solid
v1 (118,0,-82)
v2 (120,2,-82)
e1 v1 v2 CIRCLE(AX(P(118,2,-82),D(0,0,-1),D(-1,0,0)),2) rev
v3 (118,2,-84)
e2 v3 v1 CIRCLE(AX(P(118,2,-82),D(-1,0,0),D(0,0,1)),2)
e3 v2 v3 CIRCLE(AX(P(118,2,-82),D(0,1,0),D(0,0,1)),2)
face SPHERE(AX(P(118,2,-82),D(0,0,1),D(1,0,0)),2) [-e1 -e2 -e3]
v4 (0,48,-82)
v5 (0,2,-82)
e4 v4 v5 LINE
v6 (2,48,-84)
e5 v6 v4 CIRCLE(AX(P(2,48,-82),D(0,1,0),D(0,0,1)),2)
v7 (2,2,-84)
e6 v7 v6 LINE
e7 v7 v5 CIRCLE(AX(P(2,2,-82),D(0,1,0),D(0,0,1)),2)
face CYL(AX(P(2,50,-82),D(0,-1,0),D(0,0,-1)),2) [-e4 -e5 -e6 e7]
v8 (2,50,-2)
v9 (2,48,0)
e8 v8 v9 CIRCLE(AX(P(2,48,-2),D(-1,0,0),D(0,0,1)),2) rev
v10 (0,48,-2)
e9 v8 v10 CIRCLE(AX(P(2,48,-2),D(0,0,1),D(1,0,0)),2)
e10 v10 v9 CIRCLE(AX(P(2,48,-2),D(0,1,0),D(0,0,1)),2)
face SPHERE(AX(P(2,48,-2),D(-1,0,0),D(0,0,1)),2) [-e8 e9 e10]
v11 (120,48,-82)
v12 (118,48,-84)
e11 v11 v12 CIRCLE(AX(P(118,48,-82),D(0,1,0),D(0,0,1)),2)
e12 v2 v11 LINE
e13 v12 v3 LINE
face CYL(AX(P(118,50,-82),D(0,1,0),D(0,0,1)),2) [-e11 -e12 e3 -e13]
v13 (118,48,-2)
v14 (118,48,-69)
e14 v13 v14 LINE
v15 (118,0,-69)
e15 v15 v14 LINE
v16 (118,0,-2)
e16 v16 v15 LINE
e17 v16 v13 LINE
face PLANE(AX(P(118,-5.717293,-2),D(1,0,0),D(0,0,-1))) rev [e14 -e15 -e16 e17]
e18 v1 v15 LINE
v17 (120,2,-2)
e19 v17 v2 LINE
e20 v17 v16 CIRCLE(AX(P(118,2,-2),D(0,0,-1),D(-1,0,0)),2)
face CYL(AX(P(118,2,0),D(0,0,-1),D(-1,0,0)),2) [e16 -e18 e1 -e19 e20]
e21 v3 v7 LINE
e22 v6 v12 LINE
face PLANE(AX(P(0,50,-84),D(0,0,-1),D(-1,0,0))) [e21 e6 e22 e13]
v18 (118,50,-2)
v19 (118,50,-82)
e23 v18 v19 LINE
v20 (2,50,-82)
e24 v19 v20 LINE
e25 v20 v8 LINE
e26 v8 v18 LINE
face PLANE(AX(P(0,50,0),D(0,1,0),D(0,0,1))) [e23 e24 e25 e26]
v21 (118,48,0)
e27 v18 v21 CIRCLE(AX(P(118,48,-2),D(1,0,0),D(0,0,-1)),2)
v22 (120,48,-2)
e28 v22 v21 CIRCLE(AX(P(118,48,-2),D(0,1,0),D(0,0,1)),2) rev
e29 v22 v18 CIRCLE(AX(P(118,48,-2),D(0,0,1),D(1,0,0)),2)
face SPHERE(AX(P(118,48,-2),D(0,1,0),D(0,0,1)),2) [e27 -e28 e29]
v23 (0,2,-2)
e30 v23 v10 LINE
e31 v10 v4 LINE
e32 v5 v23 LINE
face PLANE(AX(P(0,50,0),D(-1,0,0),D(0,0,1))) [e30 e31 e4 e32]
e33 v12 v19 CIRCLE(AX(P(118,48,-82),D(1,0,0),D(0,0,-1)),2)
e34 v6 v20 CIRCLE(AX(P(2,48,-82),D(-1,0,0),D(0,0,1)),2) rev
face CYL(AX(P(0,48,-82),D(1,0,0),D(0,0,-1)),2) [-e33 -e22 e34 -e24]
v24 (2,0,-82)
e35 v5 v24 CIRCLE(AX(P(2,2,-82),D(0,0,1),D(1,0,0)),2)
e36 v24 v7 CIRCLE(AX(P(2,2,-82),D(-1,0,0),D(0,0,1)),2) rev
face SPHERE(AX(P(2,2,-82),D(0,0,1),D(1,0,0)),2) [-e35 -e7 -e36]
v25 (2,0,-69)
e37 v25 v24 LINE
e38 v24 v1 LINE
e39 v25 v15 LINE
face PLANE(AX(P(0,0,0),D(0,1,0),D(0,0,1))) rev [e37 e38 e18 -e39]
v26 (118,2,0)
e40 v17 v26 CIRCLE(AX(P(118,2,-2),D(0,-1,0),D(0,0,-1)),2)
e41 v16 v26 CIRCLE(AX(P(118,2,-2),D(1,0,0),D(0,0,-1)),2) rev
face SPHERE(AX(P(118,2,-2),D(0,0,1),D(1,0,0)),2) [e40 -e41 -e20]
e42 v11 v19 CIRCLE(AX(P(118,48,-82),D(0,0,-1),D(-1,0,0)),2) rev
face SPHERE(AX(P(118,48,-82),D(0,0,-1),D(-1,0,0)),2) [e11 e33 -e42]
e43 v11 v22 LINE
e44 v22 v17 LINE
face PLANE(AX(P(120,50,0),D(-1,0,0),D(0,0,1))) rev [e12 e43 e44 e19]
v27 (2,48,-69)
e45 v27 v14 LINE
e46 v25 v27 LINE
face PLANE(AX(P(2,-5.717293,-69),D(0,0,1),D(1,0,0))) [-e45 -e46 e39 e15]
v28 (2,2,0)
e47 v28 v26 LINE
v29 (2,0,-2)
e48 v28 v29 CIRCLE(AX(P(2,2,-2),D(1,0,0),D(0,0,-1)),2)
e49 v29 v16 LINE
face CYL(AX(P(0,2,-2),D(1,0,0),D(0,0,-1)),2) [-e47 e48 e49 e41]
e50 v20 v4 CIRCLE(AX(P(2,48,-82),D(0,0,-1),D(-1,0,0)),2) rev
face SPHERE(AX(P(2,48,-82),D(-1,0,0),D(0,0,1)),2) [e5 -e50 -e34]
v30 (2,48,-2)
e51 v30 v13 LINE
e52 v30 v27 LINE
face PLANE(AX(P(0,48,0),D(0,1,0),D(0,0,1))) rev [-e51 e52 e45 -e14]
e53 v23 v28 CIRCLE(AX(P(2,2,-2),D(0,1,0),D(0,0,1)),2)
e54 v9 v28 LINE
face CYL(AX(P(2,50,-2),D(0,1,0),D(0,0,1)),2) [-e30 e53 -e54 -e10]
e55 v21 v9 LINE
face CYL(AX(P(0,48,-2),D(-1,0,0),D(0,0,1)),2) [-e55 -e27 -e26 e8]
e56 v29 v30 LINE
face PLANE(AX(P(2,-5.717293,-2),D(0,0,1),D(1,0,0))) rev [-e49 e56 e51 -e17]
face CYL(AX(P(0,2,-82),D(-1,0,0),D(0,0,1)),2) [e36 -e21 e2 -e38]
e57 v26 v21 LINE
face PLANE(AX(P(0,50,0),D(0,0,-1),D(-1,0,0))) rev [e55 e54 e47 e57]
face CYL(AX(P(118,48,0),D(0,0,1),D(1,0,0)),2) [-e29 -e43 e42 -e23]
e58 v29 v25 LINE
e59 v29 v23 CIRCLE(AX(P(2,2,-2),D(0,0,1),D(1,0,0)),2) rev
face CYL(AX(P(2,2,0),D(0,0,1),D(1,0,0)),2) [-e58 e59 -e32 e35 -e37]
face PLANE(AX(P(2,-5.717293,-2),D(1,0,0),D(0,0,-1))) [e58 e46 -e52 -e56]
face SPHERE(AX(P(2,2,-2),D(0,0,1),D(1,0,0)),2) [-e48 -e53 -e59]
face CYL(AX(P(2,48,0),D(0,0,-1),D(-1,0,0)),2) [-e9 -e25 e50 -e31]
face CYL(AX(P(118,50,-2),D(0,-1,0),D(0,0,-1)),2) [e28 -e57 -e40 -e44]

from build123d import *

# Parameters (mm, degrees)
SKETCH4_W                = 120
SKETCH4_H                = 84
BOSS_EXTRUDE2_DEPTH      = 50
BOSS_EXTRUDE4_DEPTH      = 48
BOSS_EXTRUDE4_DEPTH_BACK = 5.717293385
SKETCH5_W                = 116
SKETCH5_H                = 67
FILLET2_R                = 2
FILLET3_R                = 2


# Some blends are built 0.0001 mm under size
with BuildPart() as part:
    # Sketch4 → Boss-Extrude2 (new body)
    with BuildSketch(Plane(origin=(0, 0, 0), x_dir=(1, 0, 0), z_dir=(0, 1, 0))):
        with Locations((60, 42)):
            Rectangle(SKETCH4_W, SKETCH4_H)
    extrude(amount=BOSS_EXTRUDE2_DEPTH)


with BuildPart() as body_2:
    # Sketch5 → Boss-Extrude4 (new, two sides: drawn at the far end of the back side and taken through both)
    with BuildSketch(Plane(origin=(0, 0, 0), x_dir=(1, 0, 0), z_dir=(0, 1, 0)).offset(-BOSS_EXTRUDE4_DEPTH_BACK)):
        with Locations((60, 35.5)):
            Rectangle(SKETCH5_W, SKETCH5_H)
    extrude(amount=BOSS_EXTRUDE4_DEPTH + BOSS_EXTRUDE4_DEPTH_BACK)


with BuildPart() as part_1:
    add(part.part)

    # Combine1: cut body 2
    add(body_2.part, mode=Mode.SUBTRACT)

    # Fillet2
    fillet2_edges = [part_1.edges().sort_by_distance(p)[0] for p in [
        (0, 0, -42),
        (60, 0, -84),
        (120, 0, -42),
        (60, 0, 0),
    ]]
    fillet(fillet2_edges, radius=FILLET2_R - 0.0001)  # a hair under: the kernel refuses the full size

    # Fillet3
    # the kernel refuses this fillet: 2 mm, written as the material it takes off along each edge
    with BuildSketch(Plane(origin=(118, 0, -2), x_dir=(1, 0, 0), z_dir=(0, 0, -1))) as fillet3_piece_1:
        with BuildLine():
            CenterArc((0.0001, -1.9999), 1.9999, 0, 90)
            Line((2, -1.9999), (2, 0))
            Line((2, 0), (0.0001, 0))
        make_face()
    revolve(axis=Axis((118, 0, -2), (0, -1, 0)), revolution_arc=90, mode=Mode.SUBTRACT)
    with BuildSketch(Plane(origin=(118, 0, -82), x_dir=(0, 0, -1), z_dir=(-1, 0, 0))) as fillet3_piece_2:
        with BuildLine():
            CenterArc((0.0001, -1.9999), 1.9999, 0, 90)
            Line((2, -1.9999), (2, 0))
            Line((2, 0), (0.0001, 0))
        make_face()
    revolve(axis=Axis((118, 0, -82), (0, -1, 0)), revolution_arc=90, mode=Mode.SUBTRACT)
    with BuildSketch(Plane(origin=(2, 0, -2), x_dir=(0, 0, 1), z_dir=(1, 0, 0))) as fillet3_piece_3:
        with BuildLine():
            CenterArc((0.0001, -1.9999), 1.9999, 0, 90)
            Line((2, -1.9999), (2, 0))
            Line((2, 0), (0.0001, 0))
        make_face()
    revolve(axis=Axis((2, 0, -2), (0, -1, 0)), revolution_arc=90, mode=Mode.SUBTRACT)
    with BuildSketch(Plane(origin=(2, 0, -82), x_dir=(-1, 0, 0), z_dir=(0, 0, 1))) as fillet3_piece_4:
        with BuildLine():
            CenterArc((0.0001, -1.9999), 1.9999, 0, 90)
            Line((2, -1.9999), (2, 0))
            Line((2, 0), (0.0001, 0))
        make_face()
    revolve(axis=Axis((2, 0, -82), (0, -1, 0)), revolution_arc=90, mode=Mode.SUBTRACT)
    with BuildSketch(Plane(origin=(118, 48, -82), x_dir=(1, 0, 0), z_dir=(0, 1, 0))) as fillet3_piece_5_section:
        Polygon((0, 0), (FILLET3_R, 0), (FILLET3_R, FILLET3_R), (0, FILLET3_R), align=None)
    fillet3_piece_5 = extrude(amount=FILLET3_R, mode=Mode.PRIVATE)
    fillet3_piece_5 = fillet3_piece_5 - Plane(origin=(118, 48, -82), x_dir=(-0.7071067811865475, 0, 0.7071067811865475), z_dir=(0, 1, 0)) * Sphere(FILLET3_R, mode=Mode.PRIVATE)
    add(fillet3_piece_5, mode=Mode.SUBTRACT)
    with BuildSketch(Plane(origin=(2, 48, -82), x_dir=(0, 1, 0), z_dir=(-1, 0, 0))) as fillet3_piece_6_section:
        Polygon((0, 0), (FILLET3_R, 0), (FILLET3_R, FILLET3_R), (0, FILLET3_R), align=None)
    fillet3_piece_6 = extrude(amount=FILLET3_R, mode=Mode.PRIVATE)
    fillet3_piece_6 = fillet3_piece_6 - Plane(origin=(2, 48, -82), x_dir=(0, -0.7071067811865475, 0.7071067811865475), z_dir=(-1, 0, 0)) * Sphere(FILLET3_R, mode=Mode.PRIVATE)
    add(fillet3_piece_6, mode=Mode.SUBTRACT)
    with BuildSketch(Plane(origin=(2, 48, -2), x_dir=(-1, 0, 0), z_dir=(0, 0, 1))) as fillet3_piece_7_section:
        Polygon((0, 0), (FILLET3_R, 0), (FILLET3_R, -FILLET3_R), (0, -FILLET3_R), align=None)
    fillet3_piece_7 = extrude(amount=FILLET3_R, mode=Mode.PRIVATE)
    fillet3_piece_7 = fillet3_piece_7 - Plane(origin=(2, 48, -2), x_dir=(0.7071067811865475, -0.7071067811865475, 0), z_dir=(0, 0, 1)) * Sphere(FILLET3_R, mode=Mode.PRIVATE)
    add(fillet3_piece_7, mode=Mode.SUBTRACT)
    with BuildSketch(Plane(origin=(118, 48, -2), x_dir=(0, 1, 0), z_dir=(0, 0, 1))) as fillet3_piece_8_section:
        Polygon((0, 0), (FILLET3_R, 0), (FILLET3_R, -FILLET3_R), (0, -FILLET3_R), align=None)
    fillet3_piece_8 = extrude(amount=FILLET3_R, mode=Mode.PRIVATE)
    fillet3_piece_8 = fillet3_piece_8 - Plane(origin=(118, 48, -2), x_dir=(-0.7071067811865475, -0.7071067811865475, 0), z_dir=(0, 0, 1)) * Sphere(FILLET3_R, mode=Mode.PRIVATE)
    add(fillet3_piece_8, mode=Mode.SUBTRACT)
    with BuildSketch(Plane(origin=(118, 50, -84), x_dir=(0, 0, 1), z_dir=(-1, 0, 0))) as fillet3_piece_9:
        with BuildLine():
            CenterArc((FILLET3_R, -FILLET3_R), FILLET3_R, 90, 90)
            Line((0, -FILLET3_R), (0, 0))
            Line((0, 0), (FILLET3_R, 0))
        make_face()
    extrude(amount=116, mode=Mode.SUBTRACT)
    with BuildSketch(Plane(origin=(0, 50, -82), x_dir=(0, -1, 0), z_dir=(0, 0, 1))) as fillet3_piece_10:
        with BuildLine():
            CenterArc((FILLET3_R, FILLET3_R), FILLET3_R, 180, 90)
            Line((0, FILLET3_R), (0, 0))
            Line((0, 0), (FILLET3_R, 0))
        make_face()
    extrude(amount=80, mode=Mode.SUBTRACT)
    with BuildSketch(Plane(origin=(2, 50, 0), x_dir=(0, -1, 0), z_dir=(1, 0, 0))) as fillet3_piece_11:
        with BuildLine():
            CenterArc((FILLET3_R, FILLET3_R), FILLET3_R, 180, 90)
            Line((0, FILLET3_R), (0, 0))
            Line((0, 0), (FILLET3_R, 0))
        make_face()
    extrude(amount=116, mode=Mode.SUBTRACT)
    with BuildSketch(Plane(origin=(0, 0, 0), x_dir=(1, 0, 0), z_dir=(0, 1, 0)), Plane(origin=(0, 0, -84), x_dir=(0, 0, 1), z_dir=(0, 1, 0))) as fillet3_piece_12:
        with BuildLine():
            CenterArc((FILLET3_R, FILLET3_R), FILLET3_R, 180, 90)
            Line((0, FILLET3_R), (0, 0))
            Line((0, 0), (FILLET3_R, 0))
        make_face()
    extrude(amount=48, mode=Mode.SUBTRACT)
    with BuildSketch(Plane(origin=(120, 0, -84), x_dir=(0, 0, 1), z_dir=(0, 1, 0)), Plane(origin=(120, 0, 0), x_dir=(-1, 0, 0), z_dir=(0, 1, 0))) as fillet3_piece_13:
        with BuildLine():
            CenterArc((FILLET3_R, -FILLET3_R), FILLET3_R, 90, 90)
            Line((0, -FILLET3_R), (0, 0))
            Line((0, 0), (FILLET3_R, 0))
        make_face()
    extrude(amount=48, mode=Mode.SUBTRACT)
    with BuildSketch(Plane(origin=(120, 50, -2), x_dir=(-1, 0, 0), z_dir=(0, 0, -1))) as fillet3_piece_14:
        with BuildLine():
            CenterArc((FILLET3_R, -FILLET3_R), FILLET3_R, 90, 90)
            Line((0, -FILLET3_R), (0, 0))
            Line((0, 0), (FILLET3_R, 0))
        make_face()
    extrude(amount=80, mode=Mode.SUBTRACT)


solid = part_1.part
